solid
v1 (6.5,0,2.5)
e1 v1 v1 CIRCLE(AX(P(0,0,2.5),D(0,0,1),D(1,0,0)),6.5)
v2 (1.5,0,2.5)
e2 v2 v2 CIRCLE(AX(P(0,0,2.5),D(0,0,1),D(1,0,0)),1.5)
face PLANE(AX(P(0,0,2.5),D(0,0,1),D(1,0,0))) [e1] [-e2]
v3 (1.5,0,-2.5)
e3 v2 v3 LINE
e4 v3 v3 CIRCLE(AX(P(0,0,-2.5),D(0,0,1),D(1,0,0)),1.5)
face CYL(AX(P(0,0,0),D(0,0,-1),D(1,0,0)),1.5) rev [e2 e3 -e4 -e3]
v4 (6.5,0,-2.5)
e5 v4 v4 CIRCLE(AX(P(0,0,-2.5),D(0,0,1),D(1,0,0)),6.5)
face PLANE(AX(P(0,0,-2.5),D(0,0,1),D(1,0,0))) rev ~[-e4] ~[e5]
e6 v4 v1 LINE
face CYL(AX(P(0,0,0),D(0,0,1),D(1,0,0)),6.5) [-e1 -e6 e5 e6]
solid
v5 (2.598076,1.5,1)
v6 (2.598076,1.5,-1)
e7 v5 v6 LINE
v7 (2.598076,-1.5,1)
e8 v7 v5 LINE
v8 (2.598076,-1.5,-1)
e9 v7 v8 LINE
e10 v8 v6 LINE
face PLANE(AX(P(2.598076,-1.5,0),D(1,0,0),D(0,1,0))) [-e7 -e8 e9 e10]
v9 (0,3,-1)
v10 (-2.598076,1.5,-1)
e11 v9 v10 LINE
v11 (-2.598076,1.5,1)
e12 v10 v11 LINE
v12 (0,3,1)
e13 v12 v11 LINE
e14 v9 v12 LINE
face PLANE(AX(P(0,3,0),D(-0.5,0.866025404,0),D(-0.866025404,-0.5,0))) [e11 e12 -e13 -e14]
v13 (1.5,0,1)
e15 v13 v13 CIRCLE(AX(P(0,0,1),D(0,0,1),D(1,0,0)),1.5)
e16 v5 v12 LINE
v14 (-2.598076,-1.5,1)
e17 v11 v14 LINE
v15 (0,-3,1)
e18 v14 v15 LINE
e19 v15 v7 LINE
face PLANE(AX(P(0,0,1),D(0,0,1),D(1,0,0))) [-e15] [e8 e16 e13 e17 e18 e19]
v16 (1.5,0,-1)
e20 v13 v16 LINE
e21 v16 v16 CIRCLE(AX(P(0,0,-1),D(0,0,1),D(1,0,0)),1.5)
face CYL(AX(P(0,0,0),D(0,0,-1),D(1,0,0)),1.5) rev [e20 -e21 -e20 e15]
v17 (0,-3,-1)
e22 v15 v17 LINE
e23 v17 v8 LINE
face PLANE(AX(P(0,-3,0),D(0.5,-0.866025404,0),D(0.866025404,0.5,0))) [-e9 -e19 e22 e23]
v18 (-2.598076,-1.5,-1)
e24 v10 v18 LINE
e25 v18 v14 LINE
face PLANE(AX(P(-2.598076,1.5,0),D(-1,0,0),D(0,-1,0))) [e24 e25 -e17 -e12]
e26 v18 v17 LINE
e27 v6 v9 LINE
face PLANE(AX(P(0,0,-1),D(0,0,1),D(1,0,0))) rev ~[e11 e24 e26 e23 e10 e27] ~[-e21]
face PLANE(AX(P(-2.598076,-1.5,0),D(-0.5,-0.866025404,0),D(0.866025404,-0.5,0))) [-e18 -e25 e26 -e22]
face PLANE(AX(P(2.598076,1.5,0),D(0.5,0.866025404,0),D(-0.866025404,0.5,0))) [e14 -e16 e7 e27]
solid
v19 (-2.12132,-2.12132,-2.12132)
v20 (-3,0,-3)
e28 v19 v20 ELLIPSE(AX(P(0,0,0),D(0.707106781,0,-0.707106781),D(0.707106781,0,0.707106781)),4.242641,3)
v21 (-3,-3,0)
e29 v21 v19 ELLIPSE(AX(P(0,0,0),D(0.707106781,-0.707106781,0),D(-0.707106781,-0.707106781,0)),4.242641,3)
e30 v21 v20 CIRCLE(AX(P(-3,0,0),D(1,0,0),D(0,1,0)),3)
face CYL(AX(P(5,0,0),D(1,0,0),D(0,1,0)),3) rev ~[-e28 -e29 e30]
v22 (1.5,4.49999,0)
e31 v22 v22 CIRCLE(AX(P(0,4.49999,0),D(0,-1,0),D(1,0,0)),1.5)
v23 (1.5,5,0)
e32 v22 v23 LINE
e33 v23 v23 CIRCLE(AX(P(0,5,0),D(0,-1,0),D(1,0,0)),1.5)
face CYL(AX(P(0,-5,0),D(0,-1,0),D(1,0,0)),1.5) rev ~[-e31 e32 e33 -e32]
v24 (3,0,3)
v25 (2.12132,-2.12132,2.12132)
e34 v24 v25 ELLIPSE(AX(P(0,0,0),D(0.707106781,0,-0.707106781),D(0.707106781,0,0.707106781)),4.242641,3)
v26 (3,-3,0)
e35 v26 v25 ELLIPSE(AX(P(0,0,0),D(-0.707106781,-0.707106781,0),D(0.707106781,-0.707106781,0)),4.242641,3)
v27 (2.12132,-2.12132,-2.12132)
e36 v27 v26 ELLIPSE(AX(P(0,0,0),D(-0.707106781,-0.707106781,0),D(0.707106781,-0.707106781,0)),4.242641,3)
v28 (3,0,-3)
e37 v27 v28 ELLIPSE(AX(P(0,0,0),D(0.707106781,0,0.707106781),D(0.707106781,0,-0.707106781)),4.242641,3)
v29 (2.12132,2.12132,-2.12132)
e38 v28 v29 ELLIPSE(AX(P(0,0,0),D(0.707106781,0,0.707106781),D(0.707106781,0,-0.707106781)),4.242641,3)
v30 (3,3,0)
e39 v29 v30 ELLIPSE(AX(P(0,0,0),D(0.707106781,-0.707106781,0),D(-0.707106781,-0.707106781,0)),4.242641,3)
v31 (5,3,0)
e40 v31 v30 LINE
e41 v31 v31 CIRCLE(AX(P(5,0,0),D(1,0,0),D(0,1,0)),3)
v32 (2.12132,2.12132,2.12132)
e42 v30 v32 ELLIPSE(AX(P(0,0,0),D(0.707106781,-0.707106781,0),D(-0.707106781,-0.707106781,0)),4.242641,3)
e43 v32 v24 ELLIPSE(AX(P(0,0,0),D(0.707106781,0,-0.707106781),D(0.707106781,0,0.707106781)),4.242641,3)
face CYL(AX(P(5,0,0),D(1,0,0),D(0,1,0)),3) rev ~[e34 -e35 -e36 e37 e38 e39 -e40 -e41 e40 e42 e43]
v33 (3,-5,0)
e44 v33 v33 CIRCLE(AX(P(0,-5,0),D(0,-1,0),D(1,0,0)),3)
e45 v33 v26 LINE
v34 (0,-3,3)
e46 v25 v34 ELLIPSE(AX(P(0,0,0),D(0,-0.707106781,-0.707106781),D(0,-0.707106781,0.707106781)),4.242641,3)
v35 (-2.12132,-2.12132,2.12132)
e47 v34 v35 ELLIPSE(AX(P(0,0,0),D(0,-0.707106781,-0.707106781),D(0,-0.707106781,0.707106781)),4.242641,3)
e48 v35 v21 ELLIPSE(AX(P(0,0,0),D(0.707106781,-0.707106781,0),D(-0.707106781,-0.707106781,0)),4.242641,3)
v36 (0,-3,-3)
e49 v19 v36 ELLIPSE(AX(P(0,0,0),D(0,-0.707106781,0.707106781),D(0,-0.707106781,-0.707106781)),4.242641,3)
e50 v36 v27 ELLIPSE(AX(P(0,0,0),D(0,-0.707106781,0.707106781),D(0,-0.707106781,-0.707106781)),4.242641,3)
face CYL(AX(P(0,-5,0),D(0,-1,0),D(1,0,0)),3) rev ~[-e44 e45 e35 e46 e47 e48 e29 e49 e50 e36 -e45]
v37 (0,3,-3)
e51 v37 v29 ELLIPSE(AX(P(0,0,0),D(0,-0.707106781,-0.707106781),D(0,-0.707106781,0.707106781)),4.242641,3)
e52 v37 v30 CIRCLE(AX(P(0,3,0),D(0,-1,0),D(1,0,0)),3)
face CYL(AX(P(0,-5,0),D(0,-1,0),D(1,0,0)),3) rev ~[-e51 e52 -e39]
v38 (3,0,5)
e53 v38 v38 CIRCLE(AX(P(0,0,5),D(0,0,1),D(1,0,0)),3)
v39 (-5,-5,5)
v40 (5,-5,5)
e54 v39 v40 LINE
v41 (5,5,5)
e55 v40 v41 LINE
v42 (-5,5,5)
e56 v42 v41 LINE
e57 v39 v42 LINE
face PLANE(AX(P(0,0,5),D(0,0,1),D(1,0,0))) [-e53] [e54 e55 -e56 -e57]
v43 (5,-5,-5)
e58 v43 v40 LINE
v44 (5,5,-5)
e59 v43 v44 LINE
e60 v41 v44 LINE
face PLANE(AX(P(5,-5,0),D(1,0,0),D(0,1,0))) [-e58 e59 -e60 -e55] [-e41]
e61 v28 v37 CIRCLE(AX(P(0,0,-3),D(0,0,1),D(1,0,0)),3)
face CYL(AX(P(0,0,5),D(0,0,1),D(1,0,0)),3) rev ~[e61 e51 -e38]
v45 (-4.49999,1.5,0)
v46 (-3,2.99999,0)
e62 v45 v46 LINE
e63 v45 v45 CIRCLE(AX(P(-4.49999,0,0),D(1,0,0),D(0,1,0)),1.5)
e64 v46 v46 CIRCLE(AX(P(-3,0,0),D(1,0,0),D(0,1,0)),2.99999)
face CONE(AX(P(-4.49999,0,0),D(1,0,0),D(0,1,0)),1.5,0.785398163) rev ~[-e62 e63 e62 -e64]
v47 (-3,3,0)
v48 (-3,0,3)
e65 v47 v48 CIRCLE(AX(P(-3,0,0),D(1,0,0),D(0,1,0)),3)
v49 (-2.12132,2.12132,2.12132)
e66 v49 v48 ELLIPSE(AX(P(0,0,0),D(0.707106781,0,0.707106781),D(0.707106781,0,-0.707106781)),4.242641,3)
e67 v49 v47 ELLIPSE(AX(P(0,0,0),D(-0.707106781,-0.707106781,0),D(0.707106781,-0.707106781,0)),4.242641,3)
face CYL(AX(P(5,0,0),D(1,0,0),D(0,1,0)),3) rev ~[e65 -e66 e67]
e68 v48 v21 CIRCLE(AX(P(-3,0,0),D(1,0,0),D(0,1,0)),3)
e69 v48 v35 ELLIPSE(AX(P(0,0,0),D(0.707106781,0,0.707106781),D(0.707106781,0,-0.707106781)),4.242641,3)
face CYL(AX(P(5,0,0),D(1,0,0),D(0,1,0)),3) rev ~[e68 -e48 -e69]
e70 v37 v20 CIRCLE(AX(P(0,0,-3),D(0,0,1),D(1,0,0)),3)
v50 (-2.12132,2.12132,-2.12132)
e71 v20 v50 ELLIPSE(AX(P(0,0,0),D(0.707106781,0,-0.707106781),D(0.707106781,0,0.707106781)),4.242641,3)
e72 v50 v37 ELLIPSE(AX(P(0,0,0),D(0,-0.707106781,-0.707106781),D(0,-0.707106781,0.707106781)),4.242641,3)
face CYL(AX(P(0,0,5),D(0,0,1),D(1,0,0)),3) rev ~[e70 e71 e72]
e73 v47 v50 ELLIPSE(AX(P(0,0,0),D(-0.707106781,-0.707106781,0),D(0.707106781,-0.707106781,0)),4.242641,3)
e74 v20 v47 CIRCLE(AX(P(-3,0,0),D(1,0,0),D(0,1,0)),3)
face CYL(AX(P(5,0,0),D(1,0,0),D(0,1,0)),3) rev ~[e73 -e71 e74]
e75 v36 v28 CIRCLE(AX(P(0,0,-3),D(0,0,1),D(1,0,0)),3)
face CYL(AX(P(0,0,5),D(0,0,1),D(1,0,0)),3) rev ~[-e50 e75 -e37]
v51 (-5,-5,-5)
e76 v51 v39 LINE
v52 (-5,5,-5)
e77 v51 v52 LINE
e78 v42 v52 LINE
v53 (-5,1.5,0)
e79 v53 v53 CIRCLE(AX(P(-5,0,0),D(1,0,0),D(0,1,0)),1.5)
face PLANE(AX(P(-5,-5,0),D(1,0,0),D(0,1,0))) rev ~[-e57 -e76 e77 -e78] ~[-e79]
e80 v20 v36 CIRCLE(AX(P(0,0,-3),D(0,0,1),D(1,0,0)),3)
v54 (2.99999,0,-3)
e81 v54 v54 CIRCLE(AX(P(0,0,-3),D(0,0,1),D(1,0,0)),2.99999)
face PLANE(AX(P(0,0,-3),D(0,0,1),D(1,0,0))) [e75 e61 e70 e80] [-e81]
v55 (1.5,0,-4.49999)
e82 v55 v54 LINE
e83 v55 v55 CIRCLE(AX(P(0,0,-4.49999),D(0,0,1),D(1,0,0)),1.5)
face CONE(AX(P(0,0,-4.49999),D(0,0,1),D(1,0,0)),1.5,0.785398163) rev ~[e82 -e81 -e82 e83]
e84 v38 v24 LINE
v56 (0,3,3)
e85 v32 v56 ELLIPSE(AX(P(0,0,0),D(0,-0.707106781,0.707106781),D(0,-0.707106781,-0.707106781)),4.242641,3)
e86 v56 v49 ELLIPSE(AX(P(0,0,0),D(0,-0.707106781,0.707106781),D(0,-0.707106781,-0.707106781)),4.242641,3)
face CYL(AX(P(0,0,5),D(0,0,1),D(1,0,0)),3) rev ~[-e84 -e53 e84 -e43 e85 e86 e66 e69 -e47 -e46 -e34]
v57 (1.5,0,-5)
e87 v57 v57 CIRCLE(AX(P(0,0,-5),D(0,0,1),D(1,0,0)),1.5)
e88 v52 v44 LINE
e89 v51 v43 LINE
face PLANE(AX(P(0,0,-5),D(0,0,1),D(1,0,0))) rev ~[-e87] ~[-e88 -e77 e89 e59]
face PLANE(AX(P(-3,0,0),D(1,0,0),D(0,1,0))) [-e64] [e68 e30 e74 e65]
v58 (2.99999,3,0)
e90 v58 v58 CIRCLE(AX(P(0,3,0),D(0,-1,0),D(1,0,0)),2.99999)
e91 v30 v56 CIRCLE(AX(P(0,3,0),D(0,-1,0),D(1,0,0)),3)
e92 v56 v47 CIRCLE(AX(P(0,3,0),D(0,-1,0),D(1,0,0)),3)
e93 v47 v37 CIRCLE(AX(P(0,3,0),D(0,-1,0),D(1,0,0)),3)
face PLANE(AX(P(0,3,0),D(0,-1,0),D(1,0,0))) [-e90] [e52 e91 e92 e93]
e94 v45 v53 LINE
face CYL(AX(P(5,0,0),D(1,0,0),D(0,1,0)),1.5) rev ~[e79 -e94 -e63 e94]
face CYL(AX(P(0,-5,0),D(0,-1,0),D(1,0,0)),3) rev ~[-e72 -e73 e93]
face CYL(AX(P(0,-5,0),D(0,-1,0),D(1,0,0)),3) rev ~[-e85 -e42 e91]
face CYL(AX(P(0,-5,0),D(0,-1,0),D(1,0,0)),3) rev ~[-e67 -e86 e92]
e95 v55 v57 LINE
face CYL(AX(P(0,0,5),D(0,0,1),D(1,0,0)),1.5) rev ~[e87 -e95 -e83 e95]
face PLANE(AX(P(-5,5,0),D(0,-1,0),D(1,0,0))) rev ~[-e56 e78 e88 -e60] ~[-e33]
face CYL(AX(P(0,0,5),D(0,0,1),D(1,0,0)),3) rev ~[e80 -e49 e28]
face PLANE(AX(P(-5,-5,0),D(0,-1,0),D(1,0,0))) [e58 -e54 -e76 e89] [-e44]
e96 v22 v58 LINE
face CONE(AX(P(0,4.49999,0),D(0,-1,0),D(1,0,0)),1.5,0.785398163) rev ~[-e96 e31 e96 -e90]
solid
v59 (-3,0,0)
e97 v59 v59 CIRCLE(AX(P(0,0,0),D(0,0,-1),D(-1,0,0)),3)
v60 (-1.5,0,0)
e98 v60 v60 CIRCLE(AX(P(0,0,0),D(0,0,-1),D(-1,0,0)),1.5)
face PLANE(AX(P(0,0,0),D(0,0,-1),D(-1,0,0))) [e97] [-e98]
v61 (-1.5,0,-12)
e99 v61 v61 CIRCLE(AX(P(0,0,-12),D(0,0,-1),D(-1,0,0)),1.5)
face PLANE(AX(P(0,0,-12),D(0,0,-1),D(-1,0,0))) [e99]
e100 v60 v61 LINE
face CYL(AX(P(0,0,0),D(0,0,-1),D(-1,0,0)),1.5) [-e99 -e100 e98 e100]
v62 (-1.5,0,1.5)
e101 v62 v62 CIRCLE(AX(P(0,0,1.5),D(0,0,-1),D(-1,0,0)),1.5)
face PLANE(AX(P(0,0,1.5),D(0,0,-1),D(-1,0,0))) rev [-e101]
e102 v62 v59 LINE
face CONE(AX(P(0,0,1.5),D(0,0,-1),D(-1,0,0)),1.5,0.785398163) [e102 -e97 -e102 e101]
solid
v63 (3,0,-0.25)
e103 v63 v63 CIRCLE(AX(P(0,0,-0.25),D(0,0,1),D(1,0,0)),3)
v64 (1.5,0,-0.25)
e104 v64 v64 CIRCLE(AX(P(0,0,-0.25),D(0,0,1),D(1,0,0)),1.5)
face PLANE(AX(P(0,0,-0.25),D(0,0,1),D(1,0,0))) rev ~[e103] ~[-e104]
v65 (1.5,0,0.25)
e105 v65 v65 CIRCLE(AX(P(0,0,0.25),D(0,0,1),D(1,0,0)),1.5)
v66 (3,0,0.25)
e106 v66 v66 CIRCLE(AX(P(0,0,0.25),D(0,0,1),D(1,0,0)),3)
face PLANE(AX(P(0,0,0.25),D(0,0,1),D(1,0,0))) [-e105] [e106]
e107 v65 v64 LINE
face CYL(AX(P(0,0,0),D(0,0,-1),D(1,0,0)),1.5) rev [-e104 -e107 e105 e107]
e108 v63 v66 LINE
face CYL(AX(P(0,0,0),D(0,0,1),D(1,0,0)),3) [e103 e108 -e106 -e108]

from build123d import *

# Parameters (mm, degrees)
F0_W      = 10
F0_H      = 10
F1_DEPTH  = 5
F2_R      = 3
F2_R_2    = 1.5
F3_DEPTH  = 8
F4_R      = 3
F4_R_2    = 1.5
F5_DEPTH  = 8
F6_R      = 3
F6_R_2    = 1.5
F7_DEPTH  = 8
F8_DEPTH  = 10.001
F9_DEPTH  = 10.001
F10_DEPTH = 10.001
F11_SIZE  = 1.49999
F14_R     = 6.5
F14_R_2   = 1.5
F15_DEPTH = 2.5
F16_R     = 1.5
F17_DEPTH = 1
F18_R     = 3
F18_R_2   = 1.5
F19_DEPTH = 0.25


# Not quite as in the source:
# - a fillet or chamfer is up to 0.001 mm smaller than in the source, because OpenCascade refuses the exact size


with BuildPart() as f1:
    # F0 (on Top) → F1 (new body, symmetric)
    with BuildSketch(Plane.XY):
        Rectangle(F0_W, F0_H)
    extrude(amount=F1_DEPTH, both=True)

    # F2 (on face) → F3 (cut)
    with BuildSketch(Plane.XZ.offset(5)):
        Circle(F2_R)
        Circle(F2_R_2, mode=Mode.SUBTRACT)
        Circle(F2_R_2)
    extrude(amount=-F3_DEPTH, mode=Mode.SUBTRACT)

    # F4 (on face) → F5 (cut)
    with BuildSketch(Plane.YZ.offset(5)):
        Circle(F4_R)
        Circle(F4_R_2, mode=Mode.SUBTRACT)
        Circle(F4_R_2)
    extrude(amount=-F5_DEPTH, mode=Mode.SUBTRACT)

    # F6 (on face) → F7 (cut)
    with BuildSketch(Plane.XY.offset(5)):
        Circle(F6_R)
        Circle(F6_R_2, mode=Mode.SUBTRACT)
        Circle(F6_R_2)
    extrude(amount=-F7_DEPTH, mode=Mode.SUBTRACT)

    # F2 (on face) → F8 (cut, through all)
    with BuildSketch(Plane.XZ.offset(5)):
        Circle(F2_R_2)
    extrude(amount=-F8_DEPTH, mode=Mode.SUBTRACT)

    # F4 (on face) → F9 (cut, through all)
    with BuildSketch(Plane.YZ.offset(5)):
        Circle(F4_R_2)
    extrude(amount=-F9_DEPTH, mode=Mode.SUBTRACT)

    # F6 (on face) → F10 (cut, through all)
    with BuildSketch(Plane.XY.offset(5)):
        Circle(F6_R_2)
    extrude(amount=-F10_DEPTH, mode=Mode.SUBTRACT)

    # F11 (size 1.5 in the source; OpenCascade refuses exactly that, so slightly less here)
    f11_edges = [f1.edges().sort_by_distance(p)[0] for p in [
        (-3, -1.5, 0),
        (-1.5, 3, 0),
        (-1.5, 0, -3),
    ]]
    chamfer(f11_edges, length=F11_SIZE)


with BuildPart() as f13:
    # F12 (on Front) → F13 (revolve)
    with BuildSketch(Plane.XZ):
        Polygon((0, -12), (0, 1.5), (-1.5, 1.5), (-3, 0), (-1.5, 0), (-1.5, -12), align=None)
    revolve(axis=Axis((0, 0, -5.25), (0, 0, -1)))


with BuildPart() as f15:
    # F14 (on Top) → F15 (new body, symmetric)
    with BuildSketch(Plane.XY):
        Circle(F14_R)
        Circle(F14_R_2, mode=Mode.SUBTRACT)
    extrude(amount=F15_DEPTH, both=True)


with BuildPart() as f17:
    # F16 (on Top) → F17 (new body, symmetric)
    with BuildSketch(Plane.XY):
        Polygon((2.5980762114, 1.5), (0, 3), (-2.5980762114, 1.5), (-2.5980762114, -1.5), (0, -3), (2.5980762114, -1.5), align=None)
        Circle(F16_R, mode=Mode.SUBTRACT)
    extrude(amount=F17_DEPTH, both=True)


with BuildPart() as f19:
    # F18 (on Top) → F19 (new body, symmetric)
    with BuildSketch(Plane.XY):
        Circle(F18_R)
        Circle(F18_R_2, mode=Mode.SUBTRACT)
    extrude(amount=F19_DEPTH, both=True)


solid = Compound([f1.part, f13.part, f15.part, f17.part, f19.part])
